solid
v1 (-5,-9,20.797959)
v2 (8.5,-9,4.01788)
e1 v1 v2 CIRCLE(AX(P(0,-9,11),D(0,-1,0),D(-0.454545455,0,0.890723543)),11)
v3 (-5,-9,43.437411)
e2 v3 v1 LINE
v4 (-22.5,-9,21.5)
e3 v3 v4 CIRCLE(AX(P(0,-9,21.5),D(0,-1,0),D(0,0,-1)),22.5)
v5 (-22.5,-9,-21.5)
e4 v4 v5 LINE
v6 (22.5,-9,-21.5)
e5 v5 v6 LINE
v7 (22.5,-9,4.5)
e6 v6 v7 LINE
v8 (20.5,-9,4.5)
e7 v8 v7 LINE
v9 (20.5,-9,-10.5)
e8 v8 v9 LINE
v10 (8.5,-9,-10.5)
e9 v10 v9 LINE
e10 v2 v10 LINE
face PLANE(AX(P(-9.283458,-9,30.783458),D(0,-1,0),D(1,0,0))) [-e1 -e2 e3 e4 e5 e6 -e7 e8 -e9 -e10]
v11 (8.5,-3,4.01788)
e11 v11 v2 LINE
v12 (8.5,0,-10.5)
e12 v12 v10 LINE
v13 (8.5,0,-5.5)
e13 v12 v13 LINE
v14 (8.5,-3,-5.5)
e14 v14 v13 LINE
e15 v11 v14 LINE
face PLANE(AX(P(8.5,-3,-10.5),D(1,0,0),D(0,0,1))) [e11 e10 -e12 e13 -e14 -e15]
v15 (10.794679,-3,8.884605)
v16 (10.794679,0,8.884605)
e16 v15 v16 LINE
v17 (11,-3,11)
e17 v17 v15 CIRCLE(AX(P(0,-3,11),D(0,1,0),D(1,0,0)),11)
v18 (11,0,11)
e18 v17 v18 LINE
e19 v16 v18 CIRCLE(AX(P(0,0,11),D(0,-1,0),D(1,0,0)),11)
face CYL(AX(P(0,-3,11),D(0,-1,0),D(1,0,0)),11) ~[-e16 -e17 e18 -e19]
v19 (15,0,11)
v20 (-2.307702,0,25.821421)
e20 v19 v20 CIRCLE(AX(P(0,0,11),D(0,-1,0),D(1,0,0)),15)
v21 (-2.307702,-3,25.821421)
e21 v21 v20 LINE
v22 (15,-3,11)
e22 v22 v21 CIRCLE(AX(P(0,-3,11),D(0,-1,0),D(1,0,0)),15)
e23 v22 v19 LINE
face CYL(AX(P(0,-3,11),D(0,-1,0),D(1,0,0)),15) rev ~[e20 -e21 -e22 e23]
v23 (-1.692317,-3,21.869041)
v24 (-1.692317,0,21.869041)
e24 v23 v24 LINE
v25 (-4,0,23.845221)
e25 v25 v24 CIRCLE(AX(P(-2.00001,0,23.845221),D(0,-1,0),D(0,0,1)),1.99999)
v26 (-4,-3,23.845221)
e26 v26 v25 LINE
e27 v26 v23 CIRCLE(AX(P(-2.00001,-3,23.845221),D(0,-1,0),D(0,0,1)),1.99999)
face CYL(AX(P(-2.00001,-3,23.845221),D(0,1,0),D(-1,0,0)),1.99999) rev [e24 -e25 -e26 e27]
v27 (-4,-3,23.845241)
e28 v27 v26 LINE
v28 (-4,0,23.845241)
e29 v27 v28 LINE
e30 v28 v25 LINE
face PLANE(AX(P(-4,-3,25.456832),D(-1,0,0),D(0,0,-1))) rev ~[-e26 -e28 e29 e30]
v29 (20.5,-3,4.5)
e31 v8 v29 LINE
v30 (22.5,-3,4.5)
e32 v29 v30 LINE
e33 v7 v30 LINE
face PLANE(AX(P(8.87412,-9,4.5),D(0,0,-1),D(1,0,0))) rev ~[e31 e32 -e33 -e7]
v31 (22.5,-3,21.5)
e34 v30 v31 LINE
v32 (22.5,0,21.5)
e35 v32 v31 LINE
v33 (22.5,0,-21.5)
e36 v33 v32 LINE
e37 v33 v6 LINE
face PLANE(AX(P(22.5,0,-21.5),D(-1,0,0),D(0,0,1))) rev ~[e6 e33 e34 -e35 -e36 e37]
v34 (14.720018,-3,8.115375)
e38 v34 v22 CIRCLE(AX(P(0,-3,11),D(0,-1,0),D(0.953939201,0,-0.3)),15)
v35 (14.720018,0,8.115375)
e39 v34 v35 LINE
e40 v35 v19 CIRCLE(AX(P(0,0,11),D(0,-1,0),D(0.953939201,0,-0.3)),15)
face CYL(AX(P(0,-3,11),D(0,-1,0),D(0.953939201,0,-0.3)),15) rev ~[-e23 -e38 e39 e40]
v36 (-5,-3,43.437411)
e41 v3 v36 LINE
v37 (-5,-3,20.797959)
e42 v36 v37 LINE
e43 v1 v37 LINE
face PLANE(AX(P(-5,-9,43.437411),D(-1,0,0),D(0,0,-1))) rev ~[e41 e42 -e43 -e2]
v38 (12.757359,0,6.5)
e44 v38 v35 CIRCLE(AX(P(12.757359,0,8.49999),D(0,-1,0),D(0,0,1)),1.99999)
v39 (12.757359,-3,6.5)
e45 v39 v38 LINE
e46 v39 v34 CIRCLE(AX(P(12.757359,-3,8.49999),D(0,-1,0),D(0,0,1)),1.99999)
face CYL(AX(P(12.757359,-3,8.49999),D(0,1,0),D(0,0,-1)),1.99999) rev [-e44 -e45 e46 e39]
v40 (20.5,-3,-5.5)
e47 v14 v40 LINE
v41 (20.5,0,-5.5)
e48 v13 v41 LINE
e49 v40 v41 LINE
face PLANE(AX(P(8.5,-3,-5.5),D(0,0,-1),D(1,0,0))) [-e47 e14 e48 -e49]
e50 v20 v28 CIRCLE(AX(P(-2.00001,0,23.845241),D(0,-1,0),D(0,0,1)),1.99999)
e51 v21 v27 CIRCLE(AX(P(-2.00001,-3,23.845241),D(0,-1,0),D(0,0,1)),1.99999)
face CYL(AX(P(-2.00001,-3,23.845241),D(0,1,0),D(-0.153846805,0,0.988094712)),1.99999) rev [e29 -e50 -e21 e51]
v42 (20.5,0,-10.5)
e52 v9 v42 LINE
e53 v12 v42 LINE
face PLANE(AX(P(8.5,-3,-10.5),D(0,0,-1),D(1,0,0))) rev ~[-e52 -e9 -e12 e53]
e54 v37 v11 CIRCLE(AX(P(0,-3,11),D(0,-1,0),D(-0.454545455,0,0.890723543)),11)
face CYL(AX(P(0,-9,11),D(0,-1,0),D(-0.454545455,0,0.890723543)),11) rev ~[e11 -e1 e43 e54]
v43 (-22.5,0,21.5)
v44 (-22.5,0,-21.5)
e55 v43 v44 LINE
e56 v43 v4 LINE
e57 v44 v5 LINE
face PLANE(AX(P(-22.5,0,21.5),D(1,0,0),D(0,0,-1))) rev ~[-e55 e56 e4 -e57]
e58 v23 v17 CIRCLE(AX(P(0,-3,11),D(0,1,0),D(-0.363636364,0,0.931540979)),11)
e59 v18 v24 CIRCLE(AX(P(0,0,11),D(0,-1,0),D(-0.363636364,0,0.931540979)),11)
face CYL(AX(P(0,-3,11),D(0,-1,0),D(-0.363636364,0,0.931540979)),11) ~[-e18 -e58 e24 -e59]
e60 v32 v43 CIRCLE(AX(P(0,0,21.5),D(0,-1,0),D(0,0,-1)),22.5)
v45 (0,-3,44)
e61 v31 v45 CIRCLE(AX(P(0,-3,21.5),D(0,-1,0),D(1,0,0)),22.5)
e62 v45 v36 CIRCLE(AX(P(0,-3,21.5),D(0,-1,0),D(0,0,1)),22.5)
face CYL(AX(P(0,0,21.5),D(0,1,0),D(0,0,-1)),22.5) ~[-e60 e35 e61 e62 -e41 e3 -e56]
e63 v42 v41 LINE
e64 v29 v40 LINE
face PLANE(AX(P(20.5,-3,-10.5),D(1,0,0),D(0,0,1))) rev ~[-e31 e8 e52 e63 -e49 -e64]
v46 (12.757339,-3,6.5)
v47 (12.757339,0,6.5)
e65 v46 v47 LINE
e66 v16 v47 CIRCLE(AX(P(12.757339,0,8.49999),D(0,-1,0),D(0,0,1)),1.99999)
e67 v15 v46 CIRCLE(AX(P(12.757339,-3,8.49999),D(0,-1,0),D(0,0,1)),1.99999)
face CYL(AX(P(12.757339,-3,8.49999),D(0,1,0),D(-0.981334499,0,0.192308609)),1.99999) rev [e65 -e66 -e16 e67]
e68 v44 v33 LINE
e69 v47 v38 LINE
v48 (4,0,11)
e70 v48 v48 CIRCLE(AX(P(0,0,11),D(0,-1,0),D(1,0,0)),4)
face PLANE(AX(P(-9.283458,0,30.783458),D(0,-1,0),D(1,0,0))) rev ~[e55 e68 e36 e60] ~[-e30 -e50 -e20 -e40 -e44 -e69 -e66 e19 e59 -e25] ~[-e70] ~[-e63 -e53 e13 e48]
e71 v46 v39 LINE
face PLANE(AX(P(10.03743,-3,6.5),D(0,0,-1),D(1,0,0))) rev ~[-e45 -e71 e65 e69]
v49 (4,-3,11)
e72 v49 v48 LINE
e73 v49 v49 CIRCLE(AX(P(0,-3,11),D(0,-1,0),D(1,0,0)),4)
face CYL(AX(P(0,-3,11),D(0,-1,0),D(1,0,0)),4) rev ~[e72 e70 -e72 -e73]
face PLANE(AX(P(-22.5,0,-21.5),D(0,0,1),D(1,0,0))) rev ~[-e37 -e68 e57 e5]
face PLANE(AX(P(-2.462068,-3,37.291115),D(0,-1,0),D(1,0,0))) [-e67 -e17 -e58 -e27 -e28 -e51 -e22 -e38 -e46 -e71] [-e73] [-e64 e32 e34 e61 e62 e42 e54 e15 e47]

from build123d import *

# Parameters (mm, degrees)
F1_DEPTH  = 9
F3_DEPTH  = 6
F4_R      = 4
F5_DEPTH  = 25
F6_R      = 1.99999
F7_W      = 12
F7_H      = 6
F8_DEPTH  = 15
F9_W      = 12
F9_H      = 5
F10_DEPTH = 25


# Not quite as in the source:
# - a fillet or chamfer is up to 0.001 mm smaller than in the source, because OpenCascade refuses the exact size


with BuildPart() as f1:
    # F0 (on Front) → F1 (new body)
    with BuildSketch(Plane.XZ):
        with BuildLine():
            ThreePointArc((0, 44), (-15.9099025767, 37.4099025767), (-22.5, 21.5))
            Line((-22.5, 21.5), (0, 21.5))
            Line((0, 21.5), (0, 44))
        make_face()
        with BuildLine():
            ThreePointArc((0, -1), (-15.9099025767, 5.5900974233), (-22.5, 21.5))
            Line((-22.5, 21.5), (-22.5, -21.5))
            Line((-22.5, -21.5), (0, -21.5))
            Line((0, -21.5), (0, -1))
        make_face()
        with BuildLine():
            Line((0, 21.5), (-22.5, 21.5))
            ThreePointArc((-22.5, 21.5), (-15.9099025767, 5.5900974233), (0, -1))
            Line((0, -1), (0, 21.5))
        make_face()
        with BuildLine():
            Line((0, 44), (0, 21.5))
            Line((0, 21.5), (22.5, 21.5))
            ThreePointArc((22.5, 21.5), (15.9099025767, 37.4099025767), (0, 44))
        make_face()
        with BuildLine():
            Line((22.5, 21.5), (0, 21.5))
            Line((0, 21.5), (0, -1))
            ThreePointArc((0, -1), (15.9099025767, 5.5900974233), (22.5, 21.5))
        make_face()
        with BuildLine():
            ThreePointArc((22.5, 21.5), (15.9099025767, 5.5900974233), (0, -1))
            Line((0, -1), (0, -21.5))
            Line((0, -21.5), (22.5, -21.5))
            Line((22.5, -21.5), (22.5, 21.5))
        make_face()
    extrude(amount=F1_DEPTH)

    # F2 (on face) → F3 (cut)
    with BuildSketch(Plane.XZ.offset(9)):
        with BuildLine():
            Line((0, 30.8210086077), (0, 44))
            ThreePointArc((0, 44), (-2.5157755473, 43.8589103803), (-5, 43.4374109685))
            Line((-5, 43.4374109685), (-5, 30.8210086077))
            Line((-5, 30.8210086077), (0, 30.8210086077))
        make_face()
        with BuildLine():
            Line((0, 22), (0, 30.8210086077))
            Line((0, 30.8210086077), (-5, 30.8210086077))
            Line((-5, 30.8210086077), (-5, 20.7979589711))
            ThreePointArc((-5, 20.7979589711), (-2.5712303784, 21.695268783), (0, 22))
        make_face()
        with BuildLine():
            ThreePointArc((11, 11), (7.7781745931, 18.7781745931), (0, 22))
            ThreePointArc((0, 22), (-2.5712303784, 21.695268783), (-5, 20.7979589711))
            ThreePointArc((-5, 20.7979589711), (-8.3760412767, 3.8696470964), (8.8741196746, 4.5))
            ThreePointArc((8.8741196746, 4.5), (10.4550302826, 7.5805933571), (11, 11))
        make_face()
        with BuildLine():
            ThreePointArc((22.5, 21.5), (15.9099025767, 37.4099025767), (0, 44))
            Line((0, 44), (0, 30.8210086077))
            Line((0, 30.8210086077), (0, 22))
            ThreePointArc((0, 22), (7.7781745931, 18.7781745931), (11, 11))
            ThreePointArc((11, 11), (10.4550302826, 7.5805933571), (8.8741196746, 4.5))
            Line((8.8741196746, 4.5), (22.5, 4.5))
            Line((22.5, 4.5), (22.5, 21.5))
        make_face()
    extrude(amount=-F3_DEPTH, mode=Mode.SUBTRACT)

    # F4 (on face) → F5 (cut)
    with BuildSketch(Plane.XZ.offset(3)):
        with BuildLine():
            ThreePointArc((-4, 21.246950766), (6.204836823, 20.0829510623), (11, 11))
            ThreePointArc((11, 11), (10.7566660599, 8.6991012027), (10.0374299499, 6.5))
            Line((10.0374299499, 6.5), (14.3090880213, 6.5))
            ThreePointArc((14.3090880213, 6.5), (14.8262658872, 8.7236345108), (15, 11))
            ThreePointArc((15, 11), (9.0829510623, 22.9373363863), (-4, 25.4568322948))
            Line((-4, 25.4568322948), (-4, 21.246950766))
        make_face()
        with Locations((0, 11)):
            Circle(F4_R)
    extrude(amount=-F5_DEPTH, mode=Mode.SUBTRACT)

    # F6 (radius 2 in the source; OpenCascade refuses exactly that, so slightly less here)
    f6_edges = [f1.edges().sort_by_distance(p)[0] for p in [
        (-4, -1.5, 25.456832),
        (-4, -1.5, 21.246951),
        (14.309088, -1.5, 6.5),
        (10.03743, -1.5, 6.5),
    ]]
    fillet(f6_edges, radius=F6_R)

    # F7 (on face) → F8 (cut)
    with BuildSketch(Plane.XY.offset(4.5)):
        with Locations((14.5, -6)):
            Rectangle(F7_W, F7_H)
    extrude(amount=-F8_DEPTH, mode=Mode.SUBTRACT)

    # F9 (on face) → F10 (cut)
    with BuildSketch(Plane.XZ.offset(3)):
        with Locations((14.5, -8)):
            Rectangle(F9_W, F9_H)
    extrude(amount=-F10_DEPTH, mode=Mode.SUBTRACT)


solid = f1.part
